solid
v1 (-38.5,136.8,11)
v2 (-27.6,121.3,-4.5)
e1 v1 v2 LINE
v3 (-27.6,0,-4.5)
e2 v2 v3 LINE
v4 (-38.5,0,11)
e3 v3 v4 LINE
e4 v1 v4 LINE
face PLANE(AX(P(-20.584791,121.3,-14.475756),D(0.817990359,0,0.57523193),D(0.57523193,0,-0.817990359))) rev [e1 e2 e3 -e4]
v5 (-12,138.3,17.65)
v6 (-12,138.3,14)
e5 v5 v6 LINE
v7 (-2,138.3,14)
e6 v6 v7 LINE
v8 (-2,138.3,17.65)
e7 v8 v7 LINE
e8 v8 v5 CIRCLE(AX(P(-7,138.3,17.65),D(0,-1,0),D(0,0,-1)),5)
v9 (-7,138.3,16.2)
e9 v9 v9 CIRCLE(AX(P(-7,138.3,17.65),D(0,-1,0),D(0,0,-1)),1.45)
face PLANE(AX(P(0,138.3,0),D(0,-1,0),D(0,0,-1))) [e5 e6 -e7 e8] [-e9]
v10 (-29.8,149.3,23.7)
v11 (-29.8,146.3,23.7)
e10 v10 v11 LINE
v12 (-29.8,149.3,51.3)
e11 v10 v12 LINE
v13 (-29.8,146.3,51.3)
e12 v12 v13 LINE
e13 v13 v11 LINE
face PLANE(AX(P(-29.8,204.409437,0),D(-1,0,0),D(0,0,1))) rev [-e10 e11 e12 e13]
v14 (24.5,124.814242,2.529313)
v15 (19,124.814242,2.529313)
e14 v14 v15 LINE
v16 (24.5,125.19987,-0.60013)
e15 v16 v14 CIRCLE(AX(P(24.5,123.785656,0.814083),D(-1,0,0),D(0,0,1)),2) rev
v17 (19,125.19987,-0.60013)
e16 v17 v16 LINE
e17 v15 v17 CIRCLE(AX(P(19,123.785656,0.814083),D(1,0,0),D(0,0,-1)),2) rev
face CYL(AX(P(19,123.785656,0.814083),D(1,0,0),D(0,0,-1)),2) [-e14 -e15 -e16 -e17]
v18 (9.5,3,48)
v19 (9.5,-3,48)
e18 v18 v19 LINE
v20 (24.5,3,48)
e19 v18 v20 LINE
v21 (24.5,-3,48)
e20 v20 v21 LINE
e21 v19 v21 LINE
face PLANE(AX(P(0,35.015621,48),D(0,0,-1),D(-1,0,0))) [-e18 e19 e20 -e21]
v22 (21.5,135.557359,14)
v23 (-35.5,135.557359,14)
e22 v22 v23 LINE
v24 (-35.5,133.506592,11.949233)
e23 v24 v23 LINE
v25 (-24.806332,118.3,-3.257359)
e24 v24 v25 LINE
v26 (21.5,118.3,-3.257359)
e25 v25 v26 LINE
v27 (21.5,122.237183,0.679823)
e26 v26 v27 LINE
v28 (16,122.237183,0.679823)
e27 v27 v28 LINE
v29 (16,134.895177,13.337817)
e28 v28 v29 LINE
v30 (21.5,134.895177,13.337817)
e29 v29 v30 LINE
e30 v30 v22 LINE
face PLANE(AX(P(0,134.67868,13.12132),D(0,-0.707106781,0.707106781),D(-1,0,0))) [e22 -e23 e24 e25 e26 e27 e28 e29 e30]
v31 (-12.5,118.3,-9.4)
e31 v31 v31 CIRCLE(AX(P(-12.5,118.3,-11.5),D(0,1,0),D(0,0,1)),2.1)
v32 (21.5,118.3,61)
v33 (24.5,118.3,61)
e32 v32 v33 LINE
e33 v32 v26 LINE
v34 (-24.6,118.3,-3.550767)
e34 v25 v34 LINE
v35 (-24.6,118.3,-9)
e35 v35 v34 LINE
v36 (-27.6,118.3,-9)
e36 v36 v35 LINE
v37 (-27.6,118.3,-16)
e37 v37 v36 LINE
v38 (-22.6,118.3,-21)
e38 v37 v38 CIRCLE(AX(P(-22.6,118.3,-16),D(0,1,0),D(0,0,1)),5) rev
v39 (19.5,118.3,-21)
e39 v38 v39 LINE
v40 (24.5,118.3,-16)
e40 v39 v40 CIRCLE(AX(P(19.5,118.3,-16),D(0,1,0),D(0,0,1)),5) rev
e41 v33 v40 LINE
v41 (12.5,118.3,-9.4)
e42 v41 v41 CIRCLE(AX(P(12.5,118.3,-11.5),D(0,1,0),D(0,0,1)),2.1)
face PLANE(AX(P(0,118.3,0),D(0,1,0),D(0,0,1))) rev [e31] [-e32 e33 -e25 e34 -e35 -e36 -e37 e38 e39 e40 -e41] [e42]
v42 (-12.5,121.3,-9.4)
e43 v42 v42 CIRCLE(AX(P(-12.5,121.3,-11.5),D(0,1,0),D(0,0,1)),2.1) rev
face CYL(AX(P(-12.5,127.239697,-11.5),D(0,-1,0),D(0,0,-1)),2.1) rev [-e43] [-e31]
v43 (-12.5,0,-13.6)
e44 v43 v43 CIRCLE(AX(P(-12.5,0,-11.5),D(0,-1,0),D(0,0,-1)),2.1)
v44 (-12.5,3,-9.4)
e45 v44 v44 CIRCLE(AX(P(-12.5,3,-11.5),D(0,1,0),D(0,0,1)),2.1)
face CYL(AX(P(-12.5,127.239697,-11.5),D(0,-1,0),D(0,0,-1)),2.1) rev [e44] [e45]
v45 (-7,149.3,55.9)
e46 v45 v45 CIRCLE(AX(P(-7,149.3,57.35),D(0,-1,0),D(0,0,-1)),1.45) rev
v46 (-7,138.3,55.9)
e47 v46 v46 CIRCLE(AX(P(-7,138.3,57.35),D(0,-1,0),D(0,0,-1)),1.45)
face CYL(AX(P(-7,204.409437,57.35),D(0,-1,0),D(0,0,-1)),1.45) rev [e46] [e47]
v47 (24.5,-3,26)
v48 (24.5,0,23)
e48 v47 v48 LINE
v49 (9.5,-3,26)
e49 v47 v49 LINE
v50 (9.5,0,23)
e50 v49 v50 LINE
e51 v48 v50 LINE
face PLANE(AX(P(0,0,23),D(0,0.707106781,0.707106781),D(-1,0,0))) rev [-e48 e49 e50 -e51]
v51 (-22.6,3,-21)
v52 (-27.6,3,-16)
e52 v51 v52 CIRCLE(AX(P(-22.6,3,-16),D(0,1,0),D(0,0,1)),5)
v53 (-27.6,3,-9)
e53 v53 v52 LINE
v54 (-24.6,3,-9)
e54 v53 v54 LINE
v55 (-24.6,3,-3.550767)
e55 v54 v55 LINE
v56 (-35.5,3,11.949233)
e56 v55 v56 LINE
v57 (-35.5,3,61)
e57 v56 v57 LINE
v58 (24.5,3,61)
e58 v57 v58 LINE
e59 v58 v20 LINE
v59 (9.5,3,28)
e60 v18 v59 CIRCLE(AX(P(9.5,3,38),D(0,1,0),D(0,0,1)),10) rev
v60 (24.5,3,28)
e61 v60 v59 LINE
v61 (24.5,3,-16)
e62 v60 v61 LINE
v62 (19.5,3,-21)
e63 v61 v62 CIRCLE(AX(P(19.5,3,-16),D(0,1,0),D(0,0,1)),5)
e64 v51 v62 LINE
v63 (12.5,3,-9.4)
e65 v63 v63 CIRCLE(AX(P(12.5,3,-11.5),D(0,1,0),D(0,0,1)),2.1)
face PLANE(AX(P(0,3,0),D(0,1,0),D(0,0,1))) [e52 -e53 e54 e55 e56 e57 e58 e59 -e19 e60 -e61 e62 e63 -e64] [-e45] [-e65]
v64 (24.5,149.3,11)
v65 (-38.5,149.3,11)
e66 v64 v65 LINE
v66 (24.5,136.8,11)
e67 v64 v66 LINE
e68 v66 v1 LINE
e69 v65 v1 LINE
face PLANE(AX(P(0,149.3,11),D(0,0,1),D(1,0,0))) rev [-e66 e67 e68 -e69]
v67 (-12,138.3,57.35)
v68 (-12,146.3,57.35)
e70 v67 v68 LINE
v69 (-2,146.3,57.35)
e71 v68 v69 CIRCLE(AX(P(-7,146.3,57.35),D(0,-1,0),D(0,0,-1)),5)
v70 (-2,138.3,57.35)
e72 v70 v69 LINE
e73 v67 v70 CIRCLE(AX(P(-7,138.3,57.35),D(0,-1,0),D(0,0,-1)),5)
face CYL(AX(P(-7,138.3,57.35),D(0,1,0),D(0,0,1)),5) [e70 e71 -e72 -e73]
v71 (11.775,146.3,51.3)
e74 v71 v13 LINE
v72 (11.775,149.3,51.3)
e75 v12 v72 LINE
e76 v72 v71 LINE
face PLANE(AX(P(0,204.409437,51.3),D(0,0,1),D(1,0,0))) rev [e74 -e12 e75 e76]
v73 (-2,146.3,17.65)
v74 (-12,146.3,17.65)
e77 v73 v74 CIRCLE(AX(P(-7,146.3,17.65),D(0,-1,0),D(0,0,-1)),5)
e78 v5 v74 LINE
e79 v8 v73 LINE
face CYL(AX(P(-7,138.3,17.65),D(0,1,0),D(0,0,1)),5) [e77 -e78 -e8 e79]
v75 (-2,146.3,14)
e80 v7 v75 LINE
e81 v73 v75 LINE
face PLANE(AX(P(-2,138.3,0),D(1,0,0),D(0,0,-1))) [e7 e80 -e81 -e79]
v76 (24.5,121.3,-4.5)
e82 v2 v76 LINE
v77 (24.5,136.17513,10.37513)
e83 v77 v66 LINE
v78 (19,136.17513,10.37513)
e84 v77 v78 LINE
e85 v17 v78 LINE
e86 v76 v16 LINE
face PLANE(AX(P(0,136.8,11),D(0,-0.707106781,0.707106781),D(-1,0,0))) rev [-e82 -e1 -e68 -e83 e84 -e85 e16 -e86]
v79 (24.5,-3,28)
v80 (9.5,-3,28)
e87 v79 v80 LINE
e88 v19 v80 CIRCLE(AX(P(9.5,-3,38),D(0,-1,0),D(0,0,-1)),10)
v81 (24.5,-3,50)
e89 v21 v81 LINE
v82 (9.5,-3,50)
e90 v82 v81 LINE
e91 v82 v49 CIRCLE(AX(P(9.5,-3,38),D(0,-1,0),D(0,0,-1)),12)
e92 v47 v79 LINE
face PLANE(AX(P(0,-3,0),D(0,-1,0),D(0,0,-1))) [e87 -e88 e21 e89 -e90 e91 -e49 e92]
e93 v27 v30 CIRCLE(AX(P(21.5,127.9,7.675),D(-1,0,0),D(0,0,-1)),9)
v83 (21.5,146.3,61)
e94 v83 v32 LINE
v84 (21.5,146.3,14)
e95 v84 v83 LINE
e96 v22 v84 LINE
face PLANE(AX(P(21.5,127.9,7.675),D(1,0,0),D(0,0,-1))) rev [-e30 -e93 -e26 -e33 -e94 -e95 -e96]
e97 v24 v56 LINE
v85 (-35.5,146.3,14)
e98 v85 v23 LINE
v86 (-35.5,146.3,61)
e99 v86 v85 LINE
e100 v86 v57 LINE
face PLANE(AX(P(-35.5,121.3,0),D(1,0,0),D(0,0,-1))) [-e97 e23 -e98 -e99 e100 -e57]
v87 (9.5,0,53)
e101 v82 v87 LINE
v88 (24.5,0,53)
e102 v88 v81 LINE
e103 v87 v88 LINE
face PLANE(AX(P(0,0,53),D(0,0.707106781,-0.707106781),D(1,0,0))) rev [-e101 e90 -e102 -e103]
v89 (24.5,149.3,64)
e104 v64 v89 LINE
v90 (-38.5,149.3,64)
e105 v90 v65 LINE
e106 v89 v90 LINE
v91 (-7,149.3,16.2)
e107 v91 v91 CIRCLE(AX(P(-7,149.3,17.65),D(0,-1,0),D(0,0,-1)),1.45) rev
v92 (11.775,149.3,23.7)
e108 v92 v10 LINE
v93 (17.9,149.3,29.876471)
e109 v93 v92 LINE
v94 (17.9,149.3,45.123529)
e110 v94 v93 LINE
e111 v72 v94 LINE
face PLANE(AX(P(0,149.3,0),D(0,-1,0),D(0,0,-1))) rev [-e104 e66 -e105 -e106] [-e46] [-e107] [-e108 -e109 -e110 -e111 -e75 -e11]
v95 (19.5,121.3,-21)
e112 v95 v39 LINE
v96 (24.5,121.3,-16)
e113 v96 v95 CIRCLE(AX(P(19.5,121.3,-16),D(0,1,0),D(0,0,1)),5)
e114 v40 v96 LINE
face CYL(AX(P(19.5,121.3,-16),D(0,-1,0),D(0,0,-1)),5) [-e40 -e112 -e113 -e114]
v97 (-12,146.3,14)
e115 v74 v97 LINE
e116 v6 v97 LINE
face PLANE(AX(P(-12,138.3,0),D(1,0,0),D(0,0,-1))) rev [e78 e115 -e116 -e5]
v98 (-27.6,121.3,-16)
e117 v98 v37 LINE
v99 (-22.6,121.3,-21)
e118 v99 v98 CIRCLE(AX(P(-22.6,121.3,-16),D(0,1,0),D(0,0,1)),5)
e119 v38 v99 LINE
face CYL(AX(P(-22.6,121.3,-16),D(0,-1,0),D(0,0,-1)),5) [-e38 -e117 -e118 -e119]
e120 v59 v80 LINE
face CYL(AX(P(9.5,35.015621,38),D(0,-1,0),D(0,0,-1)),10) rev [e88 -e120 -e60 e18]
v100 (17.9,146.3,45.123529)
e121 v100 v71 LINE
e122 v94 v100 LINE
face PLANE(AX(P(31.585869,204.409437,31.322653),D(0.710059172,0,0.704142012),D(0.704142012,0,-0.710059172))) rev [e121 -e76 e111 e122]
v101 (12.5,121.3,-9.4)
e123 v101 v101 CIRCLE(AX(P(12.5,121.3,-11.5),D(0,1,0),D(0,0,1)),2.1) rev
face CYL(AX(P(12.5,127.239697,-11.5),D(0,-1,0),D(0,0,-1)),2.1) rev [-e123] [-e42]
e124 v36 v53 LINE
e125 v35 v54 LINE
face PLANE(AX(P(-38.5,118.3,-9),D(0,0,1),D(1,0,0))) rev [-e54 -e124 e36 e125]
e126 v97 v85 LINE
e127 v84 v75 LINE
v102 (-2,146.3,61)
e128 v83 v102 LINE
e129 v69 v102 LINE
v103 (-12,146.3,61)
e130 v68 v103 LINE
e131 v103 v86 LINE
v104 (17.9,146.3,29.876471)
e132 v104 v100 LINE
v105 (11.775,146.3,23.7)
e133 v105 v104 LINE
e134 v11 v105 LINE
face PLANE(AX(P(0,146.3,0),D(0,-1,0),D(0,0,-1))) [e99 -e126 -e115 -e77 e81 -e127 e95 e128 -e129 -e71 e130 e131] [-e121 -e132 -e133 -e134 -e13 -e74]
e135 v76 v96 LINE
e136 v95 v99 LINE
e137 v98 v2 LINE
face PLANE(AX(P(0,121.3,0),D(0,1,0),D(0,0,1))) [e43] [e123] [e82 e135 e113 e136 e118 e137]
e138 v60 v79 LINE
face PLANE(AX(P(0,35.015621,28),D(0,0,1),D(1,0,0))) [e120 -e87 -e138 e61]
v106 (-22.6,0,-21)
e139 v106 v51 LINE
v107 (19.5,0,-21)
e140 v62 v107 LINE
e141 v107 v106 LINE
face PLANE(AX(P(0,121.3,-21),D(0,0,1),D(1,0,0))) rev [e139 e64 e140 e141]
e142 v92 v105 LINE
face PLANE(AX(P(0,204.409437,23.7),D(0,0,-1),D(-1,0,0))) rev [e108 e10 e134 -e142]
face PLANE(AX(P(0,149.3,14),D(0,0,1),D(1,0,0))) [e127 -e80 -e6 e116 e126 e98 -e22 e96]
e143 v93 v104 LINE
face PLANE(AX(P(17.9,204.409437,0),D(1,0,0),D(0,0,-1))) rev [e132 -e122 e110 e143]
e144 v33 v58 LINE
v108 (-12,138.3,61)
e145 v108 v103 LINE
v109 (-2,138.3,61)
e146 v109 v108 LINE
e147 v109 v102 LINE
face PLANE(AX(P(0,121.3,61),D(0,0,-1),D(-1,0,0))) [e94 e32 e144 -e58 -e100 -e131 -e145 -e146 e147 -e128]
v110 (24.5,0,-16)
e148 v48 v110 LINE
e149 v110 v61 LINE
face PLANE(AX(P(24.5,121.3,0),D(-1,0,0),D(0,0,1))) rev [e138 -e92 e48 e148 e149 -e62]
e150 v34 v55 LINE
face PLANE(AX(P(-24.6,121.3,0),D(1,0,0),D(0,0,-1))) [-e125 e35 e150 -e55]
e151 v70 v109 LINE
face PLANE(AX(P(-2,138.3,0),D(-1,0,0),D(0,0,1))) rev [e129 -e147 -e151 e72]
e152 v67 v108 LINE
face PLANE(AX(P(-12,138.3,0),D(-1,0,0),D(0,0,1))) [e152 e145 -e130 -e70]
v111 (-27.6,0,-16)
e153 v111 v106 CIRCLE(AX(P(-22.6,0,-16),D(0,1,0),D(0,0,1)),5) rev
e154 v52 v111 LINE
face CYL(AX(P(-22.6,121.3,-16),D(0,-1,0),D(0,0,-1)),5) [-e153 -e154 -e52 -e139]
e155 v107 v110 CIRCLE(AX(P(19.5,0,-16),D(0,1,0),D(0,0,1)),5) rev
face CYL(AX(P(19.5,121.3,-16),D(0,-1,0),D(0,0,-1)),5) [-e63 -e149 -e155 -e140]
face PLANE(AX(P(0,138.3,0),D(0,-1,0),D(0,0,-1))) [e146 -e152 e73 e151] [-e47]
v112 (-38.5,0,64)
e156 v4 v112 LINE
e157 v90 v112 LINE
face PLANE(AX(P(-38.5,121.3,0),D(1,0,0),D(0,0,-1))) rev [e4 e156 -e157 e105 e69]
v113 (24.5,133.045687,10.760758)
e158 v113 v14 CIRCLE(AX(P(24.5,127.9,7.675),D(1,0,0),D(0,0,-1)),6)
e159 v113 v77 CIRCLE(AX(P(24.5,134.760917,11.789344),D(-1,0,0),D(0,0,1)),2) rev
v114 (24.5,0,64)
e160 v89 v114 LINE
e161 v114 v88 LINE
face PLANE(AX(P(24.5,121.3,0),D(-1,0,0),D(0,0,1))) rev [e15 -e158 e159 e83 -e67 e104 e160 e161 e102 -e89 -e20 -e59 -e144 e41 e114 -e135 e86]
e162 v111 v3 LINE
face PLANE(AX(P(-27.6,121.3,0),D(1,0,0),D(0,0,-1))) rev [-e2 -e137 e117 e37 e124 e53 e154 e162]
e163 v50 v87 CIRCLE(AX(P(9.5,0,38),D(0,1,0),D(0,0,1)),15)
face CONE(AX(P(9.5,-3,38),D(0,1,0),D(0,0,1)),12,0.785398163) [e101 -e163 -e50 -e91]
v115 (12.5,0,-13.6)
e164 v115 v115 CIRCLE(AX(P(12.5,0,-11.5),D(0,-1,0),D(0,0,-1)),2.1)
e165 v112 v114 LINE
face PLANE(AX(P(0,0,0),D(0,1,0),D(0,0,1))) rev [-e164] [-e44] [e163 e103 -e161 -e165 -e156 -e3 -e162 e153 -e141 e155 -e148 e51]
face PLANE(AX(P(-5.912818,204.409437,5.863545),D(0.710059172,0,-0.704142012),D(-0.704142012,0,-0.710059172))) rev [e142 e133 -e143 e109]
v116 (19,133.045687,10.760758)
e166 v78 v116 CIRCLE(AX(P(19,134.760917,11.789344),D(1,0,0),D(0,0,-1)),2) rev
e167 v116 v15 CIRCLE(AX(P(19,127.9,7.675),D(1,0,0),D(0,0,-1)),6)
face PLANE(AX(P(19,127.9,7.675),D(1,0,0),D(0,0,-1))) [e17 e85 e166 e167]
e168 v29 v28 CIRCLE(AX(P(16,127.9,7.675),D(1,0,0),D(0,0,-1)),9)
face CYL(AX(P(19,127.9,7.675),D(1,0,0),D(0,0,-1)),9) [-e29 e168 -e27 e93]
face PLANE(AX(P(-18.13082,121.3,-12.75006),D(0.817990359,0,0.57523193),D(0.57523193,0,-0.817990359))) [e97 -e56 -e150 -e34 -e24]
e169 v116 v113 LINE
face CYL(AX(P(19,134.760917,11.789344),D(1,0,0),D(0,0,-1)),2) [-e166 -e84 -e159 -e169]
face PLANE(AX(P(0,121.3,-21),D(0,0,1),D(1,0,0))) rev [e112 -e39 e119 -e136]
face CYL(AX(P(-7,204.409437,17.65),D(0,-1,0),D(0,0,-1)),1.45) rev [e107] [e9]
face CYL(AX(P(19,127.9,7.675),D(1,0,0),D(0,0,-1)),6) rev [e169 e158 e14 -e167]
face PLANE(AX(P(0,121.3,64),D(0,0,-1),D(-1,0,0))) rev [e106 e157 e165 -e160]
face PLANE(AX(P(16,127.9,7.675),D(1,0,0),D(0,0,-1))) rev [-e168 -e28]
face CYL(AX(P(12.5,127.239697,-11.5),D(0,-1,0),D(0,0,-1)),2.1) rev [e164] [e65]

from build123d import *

# Parameters (mm, degrees)
SKETCH2_W           = 63
SKETCH2_H           = 53
BOSS_EXTRUDE1_DEPTH = 121.3
BOSS_EXTRUDE2_START = 121.3
SKETCH2_3_W         = 63
SKETCH2_3_H         = 53
BOSS_EXTRUDE2_DEPTH = 28
CHAMFER5_SIZE       = 15.5
SKETCH7_R           = 6
CUT_EXTRUDE3_DEPTH  = 5.5
FILLET5_R           = 2
SHELL2_START        = 3
SHELL2_DEPTH        = 115.3
SHELL2_START_2      = 134.895176786
SHELL2_2_DEPTH      = 11.404823214
SHELL2_START_3      = 118.3
SHELL2_3_DEPTH      = 0.6
SHELL2_START_4      = -35.5
SHELL2_4_DEPTH      = 51.5
SHELL2_START_5      = 16
SHELL2_5_DEPTH      = 8.5
SHELL2_START_6      = -25.165077586
SHELL2_6_DEPTH      = 3
SKETCH4_W           = 12
SKETCH4_H           = 115.3
CUT_EXTRUDE1_DEPTH  = 175.228269807
BOSS_EXTRUDE5_START = -3
BOSS_EXTRUDE5_DEPTH = 3
CUT_EXTRUDE2_REACH  = 168.939
SKETCH6_R           = 2.1
SKETCH8_R           = 1.45
CUT_EXTRUDE4_DEPTH  = 3
BOSS_EXTRUDE6_START = 8
SKETCH8_3_R         = 1.45
BOSS_EXTRUDE6_DEPTH = 8
CUT_EXTRUDE5_REACH  = 168.939
BOSS_EXTRUDE7_START = 3
BOSS_EXTRUDE7_DEPTH = 3
CHAMFER7_SIZE       = 3
FILLET6_R           = 5


with BuildPart() as part:
    # Sketch2 → Boss-Extrude1 (new body)
    with BuildSketch(Plane(origin=(0, 0, 0), x_dir=(1, 0, 0), z_dir=(0, 1, 0))):
        Polygon((24.5, -11), (24.5, 21), (-27.6, 21), (-27.6, 4.5), (-38.5, -11), align=None)
        with Locations((-7, -37.5)):
            Rectangle(SKETCH2_W, SKETCH2_H)
    extrude(amount=BOSS_EXTRUDE1_DEPTH)

    # Sketch2<3> → Boss-Extrude2 (add)
    with BuildSketch(Plane(origin=(0, 0, 0), x_dir=(1, 0, 0), z_dir=(0, 1, 0)).offset(BOSS_EXTRUDE2_START)):
        with Locations((-7, -37.5)):
            Rectangle(SKETCH2_3_W, SKETCH2_3_H)
    extrude(amount=BOSS_EXTRUDE2_DEPTH)

    # Chamfer5
    chamfer5_edges = [part.edges().sort_by_distance(p)[0] for p in [
        (-7, 121.3, 11),
    ]]
    chamfer(chamfer5_edges, length=CHAMFER5_SIZE)

    # Sketch7 → Cut-Extrude3 (cut)
    with BuildSketch(Plane(origin=(24.5, 0, 0), x_dir=(0, 0, -1), z_dir=(1, 0, 0))):
        with Locations((-7.675, 127.9)):
            Circle(SKETCH7_R)
    extrude(amount=-CUT_EXTRUDE3_DEPTH, mode=Mode.SUBTRACT)

    # Fillet5
    fillet5_edges = [part.edges().sort_by_distance(p)[0] for p in [
        (21.75, 133.885912692, 8.085912692),
        (21.75, 127.489087308, 1.689087308),
    ]]
    fillet(fillet5_edges, radius=FILLET5_R)

    # Shell2: read off the stored shape, not the designer's step
    # Shell2 outline → Shell2 (cut)
    with BuildSketch(Plane(origin=(0, 0, 0), x_dir=(1, 0, 0), z_dir=(0, 1, 0)).offset(SHELL2_START)):
        Polygon((-24.6, 3.550767359), (-35.5, -11.949232641), (-35.5, -61), (24.5, -61), (24.5, 18), (-24.6, 18), align=None)
    extrude(amount=SHELL2_DEPTH, mode=Mode.SUBTRACT)

    # Shell2 2 outline → Shell2 2 (cut)
    with BuildSketch(Plane(origin=(0, 0, 0), x_dir=(1, 0, 0), z_dir=(0, 1, 0)).offset(SHELL2_START_2)):
        Polygon((16, -14), (-35.5, -14), (-35.5, -61), (24.5, -61), (24.5, -14), align=None)
    extrude(amount=SHELL2_2_DEPTH, mode=Mode.SUBTRACT)

    # Shell2 3 outline → Shell2 3 (cut)
    with BuildSketch(Plane(origin=(0, 0, 0), x_dir=(1, 0, 0), z_dir=(0, 1, 0)).offset(SHELL2_START_3)):
        Polygon((16, -14), (-35.5, -14), (-35.5, -61), (24.5, -61), (24.5, -14), align=None)
    extrude(amount=SHELL2_3_DEPTH, mode=Mode.SUBTRACT)

    # Shell2 4 outline → Shell2 4 (cut)
    with BuildSketch(Plane.YZ.offset(SHELL2_START_4)):
        Polygon((134.895176786, 61), (118.9, 61), (118.9, 14), (118.3, 14), (118.3, -3.257359313), (135.557359313, 14), (134.895176786, 14), align=None)
    extrude(amount=SHELL2_4_DEPTH, mode=Mode.SUBTRACT)

    # Shell2 5 outline → Shell2 5 (cut)
    with BuildSketch(Plane.YZ.offset(SHELL2_START_5)):
        with BuildLine():
            Line((134.895176786, 61), (118.9, 61))
            Line((118.9, 61), (118.9, 14))
            Line((118.9, 14), (118.3, 14))
            Line((118.3, 14), (118.3, -3.257359313))
            Line((118.3, -3.257359313), (122.237182527, 0.679823214))
            ThreePointArc((122.237182527, 0.679823214), (121.536038969, 14.038961031), (134.895176786, 13.337817473))
            Line((134.895176786, 13.337817473), (135.557359313, 14))
            Line((135.557359313, 14), (134.895176786, 14))
            Line((134.895176786, 14), (134.895176786, 61))
        make_face()
    extrude(amount=SHELL2_5_DEPTH, mode=Mode.SUBTRACT)

    # Shell2 6 outline → Shell2 6 (add)
    with BuildSketch(Plane(origin=(0, 0, 0), x_dir=(0.5752319297142107, 0, -0.8179903587679168), z_dir=(0.8179903587679168, 0, 0.5752319297142109)).offset(SHELL2_START_6)):
        Polygon((-30.1950906, 3), (-11.246212005, 3), (-11.246212005, 118.3), (-11.604905776, 118.3), (-30.1950906, 133.506591954), align=None)
    extrude(amount=SHELL2_6_DEPTH)

    # Sketch4 → Cut-Extrude1 (cut, through all)
    with BuildSketch(Plane(origin=(24.5, 0, 0), x_dir=(0, 0, -1), z_dir=(1, 0, 0))):
        with Locations((15, 60.65)):
            Rectangle(SKETCH4_W, SKETCH4_H)
    extrude(amount=-CUT_EXTRUDE1_DEPTH, mode=Mode.SUBTRACT)

    # Sketch5 → Boss-Extrude5 (add)
    with BuildSketch(Plane(origin=(24.5, 0, 0), x_dir=(0, 0, -1), z_dir=(1, 0, 0)).offset(BOSS_EXTRUDE5_START)):
        with BuildLine():
            Line((3.257359313, 118.3), (-61, 118.3))
            Line((-61, 118.3), (-61, 146.3))
            Line((-61, 146.3), (-14, 146.3))
            Line((-14, 146.3), (-14, 135.557359313))
            Line((-14, 135.557359313), (-13.337817473, 134.895176786))
            ThreePointArc((-13.337817473, 134.895176786), (-14.038961031, 121.536038969), (-0.679823214, 122.237182527))
            Line((-0.679823214, 122.237182527), (3.257359313, 118.3))
        make_face()
    extrude(amount=BOSS_EXTRUDE5_DEPTH)

    # Cut-Extrude2: up to this face of the body (flat: up to its plane)
    cut_extrude2_end = Plane(part.part.faces().sort_by_distance((-1.55, 121.3, -12.75))[0])
    # Sketch6 → Cut-Extrude2 (cut, up to the picked face)
    with BuildSketch(Plane.XZ, mode=Mode.PRIVATE) as cut_extrude2_sk1:
        with Locations(Location((-12.5, -11.5, 0), (0, 0, 270))):
            Circle(SKETCH6_R)
    cut_extrude2_tool1 = split(extrude(cut_extrude2_sk1.sketch, amount=-CUT_EXTRUDE2_REACH, mode=Mode.PRIVATE), bisect_by=cut_extrude2_end, keep=Keep.BOTH, mode=Mode.PRIVATE)
    # Sketch6 → Cut-Extrude2 (cut, up to the picked face)
    with BuildSketch(Plane.XZ, mode=Mode.PRIVATE) as cut_extrude2_sk2:
        with Locations(Location((12.5, -11.5, 0), (0, 0, 270))):
            Circle(SKETCH6_R)
    cut_extrude2_tool2 = split(extrude(cut_extrude2_sk2.sketch, amount=-CUT_EXTRUDE2_REACH, mode=Mode.PRIVATE), bisect_by=cut_extrude2_end, keep=Keep.BOTH, mode=Mode.PRIVATE)
    add(cut_extrude2_tool1.solids().sort_by(Axis((-12.5, 0, -11.5), (0, 1, 0)))[0], mode=Mode.SUBTRACT)
    add(cut_extrude2_tool2.solids().sort_by(Axis((12.5, 0, -11.5), (0, 1, 0)))[0], mode=Mode.SUBTRACT)

    # Sketch8 → Cut-Extrude4 (cut)
    with BuildSketch(Plane.XZ.offset(-146.3)):
        Polygon((17.9, 45.123529412), (11.775, 51.3), (-29.8, 51.3), (-29.8, 23.7), (11.775, 23.7), (17.9, 29.876470588), align=None)
        with Locations(Location((-7, 17.65, 0), (0, 0, 270))):
            Circle(SKETCH8_R)
        with Locations(Location((-7, 57.35, 0), (0, 0, 270))):
            Circle(SKETCH8_R)
    extrude(amount=-CUT_EXTRUDE4_DEPTH, mode=Mode.SUBTRACT)

    # Sketch8<3> → Boss-Extrude6 (add)
    # profile 1 of 2: a face of its own
    with BuildSketch(Plane.XZ.offset(-146.3).offset(BOSS_EXTRUDE6_START)):
        with BuildLine():
            Line((-12, 61), (-12, 57.35))
            ThreePointArc((-12, 57.35), (-7, 52.35), (-2, 57.35))
            Line((-2, 57.35), (-2, 61))
            Line((-2, 61), (-12, 61))
        make_face()
        with Locations(Location((-7, 57.35, 0), (0, 0, 270))):
            Circle(SKETCH8_3_R, mode=Mode.SUBTRACT)
    # profile 2 of 2: a face of its own
    with BuildSketch(Plane.XZ.offset(-146.3).offset(BOSS_EXTRUDE6_START)):
        with BuildLine():
            ThreePointArc((-2, 17.65), (-7, 22.65), (-12, 17.65))
            Line((-12, 17.65), (-12, 14))
            Line((-12, 14), (-2, 14))
            Line((-2, 14), (-2, 17.65))
        make_face()
        with Locations(Location((-7, 17.65, 0), (0, 0, 270))):
            Circle(SKETCH8_3_R, mode=Mode.SUBTRACT)
    extrude(amount=-BOSS_EXTRUDE6_DEPTH)

    # Sketch9 → Cut-Extrude5 (cut, up to next)
    with BuildSketch(Plane.XZ, mode=Mode.PRIVATE) as cut_extrude5_sk1:
        with BuildLine():
            Line((24.5, 48), (9.5, 48))
            ThreePointArc((9.5, 48), (-0.5, 38), (9.5, 28))
            Line((9.5, 28), (24.5, 28))
            Line((24.5, 28), (24.5, 48))
        make_face()
    cut_extrude5_tool1 = extrude(cut_extrude5_sk1.sketch, amount=-CUT_EXTRUDE5_REACH, mode=Mode.PRIVATE) & part.part
    add(cut_extrude5_tool1.solids().sort_by_distance((12.964021, 0, 38))[0], mode=Mode.SUBTRACT)

    # Sketch9<4> → Boss-Extrude7 (add)
    with BuildSketch(Plane.XZ.offset(BOSS_EXTRUDE7_START)):
        with BuildLine():
            ThreePointArc((9.5, 28), (-0.5, 38), (9.5, 48))
            Line((9.5, 48), (24.5, 48))
            Line((24.5, 48), (24.5, 50))
            Line((24.5, 50), (9.5, 50))
            ThreePointArc((9.5, 50), (-2.5, 38), (9.5, 26))
            Line((9.5, 26), (24.5, 26))
            Line((24.5, 26), (24.5, 28))
            Line((24.5, 28), (9.5, 28))
        make_face()
    extrude(amount=-BOSS_EXTRUDE7_DEPTH)

    # Chamfer7
    chamfer7_edges = [part.edges().sort_by_distance(p)[0] for p in [
        (17, 0, 26),
        (-2.5, 0, 38),
        (17, 0, 50),
    ]]
    chamfer(chamfer7_edges, length=CHAMFER7_SIZE - 0.0001)  # a hair under: the kernel refuses the full size

    # Fillet6
    fillet6_edges = [part.edges().sort_by_distance(p)[0] for p in [
        (-27.6, 1.5, -21),
        (24.5, 1.5, -21),
        (-27.6, 119.8, -21),
        (24.5, 119.8, -21),
    ]]
    fillet(fillet6_edges, radius=FILLET6_R)


solid = part.part
